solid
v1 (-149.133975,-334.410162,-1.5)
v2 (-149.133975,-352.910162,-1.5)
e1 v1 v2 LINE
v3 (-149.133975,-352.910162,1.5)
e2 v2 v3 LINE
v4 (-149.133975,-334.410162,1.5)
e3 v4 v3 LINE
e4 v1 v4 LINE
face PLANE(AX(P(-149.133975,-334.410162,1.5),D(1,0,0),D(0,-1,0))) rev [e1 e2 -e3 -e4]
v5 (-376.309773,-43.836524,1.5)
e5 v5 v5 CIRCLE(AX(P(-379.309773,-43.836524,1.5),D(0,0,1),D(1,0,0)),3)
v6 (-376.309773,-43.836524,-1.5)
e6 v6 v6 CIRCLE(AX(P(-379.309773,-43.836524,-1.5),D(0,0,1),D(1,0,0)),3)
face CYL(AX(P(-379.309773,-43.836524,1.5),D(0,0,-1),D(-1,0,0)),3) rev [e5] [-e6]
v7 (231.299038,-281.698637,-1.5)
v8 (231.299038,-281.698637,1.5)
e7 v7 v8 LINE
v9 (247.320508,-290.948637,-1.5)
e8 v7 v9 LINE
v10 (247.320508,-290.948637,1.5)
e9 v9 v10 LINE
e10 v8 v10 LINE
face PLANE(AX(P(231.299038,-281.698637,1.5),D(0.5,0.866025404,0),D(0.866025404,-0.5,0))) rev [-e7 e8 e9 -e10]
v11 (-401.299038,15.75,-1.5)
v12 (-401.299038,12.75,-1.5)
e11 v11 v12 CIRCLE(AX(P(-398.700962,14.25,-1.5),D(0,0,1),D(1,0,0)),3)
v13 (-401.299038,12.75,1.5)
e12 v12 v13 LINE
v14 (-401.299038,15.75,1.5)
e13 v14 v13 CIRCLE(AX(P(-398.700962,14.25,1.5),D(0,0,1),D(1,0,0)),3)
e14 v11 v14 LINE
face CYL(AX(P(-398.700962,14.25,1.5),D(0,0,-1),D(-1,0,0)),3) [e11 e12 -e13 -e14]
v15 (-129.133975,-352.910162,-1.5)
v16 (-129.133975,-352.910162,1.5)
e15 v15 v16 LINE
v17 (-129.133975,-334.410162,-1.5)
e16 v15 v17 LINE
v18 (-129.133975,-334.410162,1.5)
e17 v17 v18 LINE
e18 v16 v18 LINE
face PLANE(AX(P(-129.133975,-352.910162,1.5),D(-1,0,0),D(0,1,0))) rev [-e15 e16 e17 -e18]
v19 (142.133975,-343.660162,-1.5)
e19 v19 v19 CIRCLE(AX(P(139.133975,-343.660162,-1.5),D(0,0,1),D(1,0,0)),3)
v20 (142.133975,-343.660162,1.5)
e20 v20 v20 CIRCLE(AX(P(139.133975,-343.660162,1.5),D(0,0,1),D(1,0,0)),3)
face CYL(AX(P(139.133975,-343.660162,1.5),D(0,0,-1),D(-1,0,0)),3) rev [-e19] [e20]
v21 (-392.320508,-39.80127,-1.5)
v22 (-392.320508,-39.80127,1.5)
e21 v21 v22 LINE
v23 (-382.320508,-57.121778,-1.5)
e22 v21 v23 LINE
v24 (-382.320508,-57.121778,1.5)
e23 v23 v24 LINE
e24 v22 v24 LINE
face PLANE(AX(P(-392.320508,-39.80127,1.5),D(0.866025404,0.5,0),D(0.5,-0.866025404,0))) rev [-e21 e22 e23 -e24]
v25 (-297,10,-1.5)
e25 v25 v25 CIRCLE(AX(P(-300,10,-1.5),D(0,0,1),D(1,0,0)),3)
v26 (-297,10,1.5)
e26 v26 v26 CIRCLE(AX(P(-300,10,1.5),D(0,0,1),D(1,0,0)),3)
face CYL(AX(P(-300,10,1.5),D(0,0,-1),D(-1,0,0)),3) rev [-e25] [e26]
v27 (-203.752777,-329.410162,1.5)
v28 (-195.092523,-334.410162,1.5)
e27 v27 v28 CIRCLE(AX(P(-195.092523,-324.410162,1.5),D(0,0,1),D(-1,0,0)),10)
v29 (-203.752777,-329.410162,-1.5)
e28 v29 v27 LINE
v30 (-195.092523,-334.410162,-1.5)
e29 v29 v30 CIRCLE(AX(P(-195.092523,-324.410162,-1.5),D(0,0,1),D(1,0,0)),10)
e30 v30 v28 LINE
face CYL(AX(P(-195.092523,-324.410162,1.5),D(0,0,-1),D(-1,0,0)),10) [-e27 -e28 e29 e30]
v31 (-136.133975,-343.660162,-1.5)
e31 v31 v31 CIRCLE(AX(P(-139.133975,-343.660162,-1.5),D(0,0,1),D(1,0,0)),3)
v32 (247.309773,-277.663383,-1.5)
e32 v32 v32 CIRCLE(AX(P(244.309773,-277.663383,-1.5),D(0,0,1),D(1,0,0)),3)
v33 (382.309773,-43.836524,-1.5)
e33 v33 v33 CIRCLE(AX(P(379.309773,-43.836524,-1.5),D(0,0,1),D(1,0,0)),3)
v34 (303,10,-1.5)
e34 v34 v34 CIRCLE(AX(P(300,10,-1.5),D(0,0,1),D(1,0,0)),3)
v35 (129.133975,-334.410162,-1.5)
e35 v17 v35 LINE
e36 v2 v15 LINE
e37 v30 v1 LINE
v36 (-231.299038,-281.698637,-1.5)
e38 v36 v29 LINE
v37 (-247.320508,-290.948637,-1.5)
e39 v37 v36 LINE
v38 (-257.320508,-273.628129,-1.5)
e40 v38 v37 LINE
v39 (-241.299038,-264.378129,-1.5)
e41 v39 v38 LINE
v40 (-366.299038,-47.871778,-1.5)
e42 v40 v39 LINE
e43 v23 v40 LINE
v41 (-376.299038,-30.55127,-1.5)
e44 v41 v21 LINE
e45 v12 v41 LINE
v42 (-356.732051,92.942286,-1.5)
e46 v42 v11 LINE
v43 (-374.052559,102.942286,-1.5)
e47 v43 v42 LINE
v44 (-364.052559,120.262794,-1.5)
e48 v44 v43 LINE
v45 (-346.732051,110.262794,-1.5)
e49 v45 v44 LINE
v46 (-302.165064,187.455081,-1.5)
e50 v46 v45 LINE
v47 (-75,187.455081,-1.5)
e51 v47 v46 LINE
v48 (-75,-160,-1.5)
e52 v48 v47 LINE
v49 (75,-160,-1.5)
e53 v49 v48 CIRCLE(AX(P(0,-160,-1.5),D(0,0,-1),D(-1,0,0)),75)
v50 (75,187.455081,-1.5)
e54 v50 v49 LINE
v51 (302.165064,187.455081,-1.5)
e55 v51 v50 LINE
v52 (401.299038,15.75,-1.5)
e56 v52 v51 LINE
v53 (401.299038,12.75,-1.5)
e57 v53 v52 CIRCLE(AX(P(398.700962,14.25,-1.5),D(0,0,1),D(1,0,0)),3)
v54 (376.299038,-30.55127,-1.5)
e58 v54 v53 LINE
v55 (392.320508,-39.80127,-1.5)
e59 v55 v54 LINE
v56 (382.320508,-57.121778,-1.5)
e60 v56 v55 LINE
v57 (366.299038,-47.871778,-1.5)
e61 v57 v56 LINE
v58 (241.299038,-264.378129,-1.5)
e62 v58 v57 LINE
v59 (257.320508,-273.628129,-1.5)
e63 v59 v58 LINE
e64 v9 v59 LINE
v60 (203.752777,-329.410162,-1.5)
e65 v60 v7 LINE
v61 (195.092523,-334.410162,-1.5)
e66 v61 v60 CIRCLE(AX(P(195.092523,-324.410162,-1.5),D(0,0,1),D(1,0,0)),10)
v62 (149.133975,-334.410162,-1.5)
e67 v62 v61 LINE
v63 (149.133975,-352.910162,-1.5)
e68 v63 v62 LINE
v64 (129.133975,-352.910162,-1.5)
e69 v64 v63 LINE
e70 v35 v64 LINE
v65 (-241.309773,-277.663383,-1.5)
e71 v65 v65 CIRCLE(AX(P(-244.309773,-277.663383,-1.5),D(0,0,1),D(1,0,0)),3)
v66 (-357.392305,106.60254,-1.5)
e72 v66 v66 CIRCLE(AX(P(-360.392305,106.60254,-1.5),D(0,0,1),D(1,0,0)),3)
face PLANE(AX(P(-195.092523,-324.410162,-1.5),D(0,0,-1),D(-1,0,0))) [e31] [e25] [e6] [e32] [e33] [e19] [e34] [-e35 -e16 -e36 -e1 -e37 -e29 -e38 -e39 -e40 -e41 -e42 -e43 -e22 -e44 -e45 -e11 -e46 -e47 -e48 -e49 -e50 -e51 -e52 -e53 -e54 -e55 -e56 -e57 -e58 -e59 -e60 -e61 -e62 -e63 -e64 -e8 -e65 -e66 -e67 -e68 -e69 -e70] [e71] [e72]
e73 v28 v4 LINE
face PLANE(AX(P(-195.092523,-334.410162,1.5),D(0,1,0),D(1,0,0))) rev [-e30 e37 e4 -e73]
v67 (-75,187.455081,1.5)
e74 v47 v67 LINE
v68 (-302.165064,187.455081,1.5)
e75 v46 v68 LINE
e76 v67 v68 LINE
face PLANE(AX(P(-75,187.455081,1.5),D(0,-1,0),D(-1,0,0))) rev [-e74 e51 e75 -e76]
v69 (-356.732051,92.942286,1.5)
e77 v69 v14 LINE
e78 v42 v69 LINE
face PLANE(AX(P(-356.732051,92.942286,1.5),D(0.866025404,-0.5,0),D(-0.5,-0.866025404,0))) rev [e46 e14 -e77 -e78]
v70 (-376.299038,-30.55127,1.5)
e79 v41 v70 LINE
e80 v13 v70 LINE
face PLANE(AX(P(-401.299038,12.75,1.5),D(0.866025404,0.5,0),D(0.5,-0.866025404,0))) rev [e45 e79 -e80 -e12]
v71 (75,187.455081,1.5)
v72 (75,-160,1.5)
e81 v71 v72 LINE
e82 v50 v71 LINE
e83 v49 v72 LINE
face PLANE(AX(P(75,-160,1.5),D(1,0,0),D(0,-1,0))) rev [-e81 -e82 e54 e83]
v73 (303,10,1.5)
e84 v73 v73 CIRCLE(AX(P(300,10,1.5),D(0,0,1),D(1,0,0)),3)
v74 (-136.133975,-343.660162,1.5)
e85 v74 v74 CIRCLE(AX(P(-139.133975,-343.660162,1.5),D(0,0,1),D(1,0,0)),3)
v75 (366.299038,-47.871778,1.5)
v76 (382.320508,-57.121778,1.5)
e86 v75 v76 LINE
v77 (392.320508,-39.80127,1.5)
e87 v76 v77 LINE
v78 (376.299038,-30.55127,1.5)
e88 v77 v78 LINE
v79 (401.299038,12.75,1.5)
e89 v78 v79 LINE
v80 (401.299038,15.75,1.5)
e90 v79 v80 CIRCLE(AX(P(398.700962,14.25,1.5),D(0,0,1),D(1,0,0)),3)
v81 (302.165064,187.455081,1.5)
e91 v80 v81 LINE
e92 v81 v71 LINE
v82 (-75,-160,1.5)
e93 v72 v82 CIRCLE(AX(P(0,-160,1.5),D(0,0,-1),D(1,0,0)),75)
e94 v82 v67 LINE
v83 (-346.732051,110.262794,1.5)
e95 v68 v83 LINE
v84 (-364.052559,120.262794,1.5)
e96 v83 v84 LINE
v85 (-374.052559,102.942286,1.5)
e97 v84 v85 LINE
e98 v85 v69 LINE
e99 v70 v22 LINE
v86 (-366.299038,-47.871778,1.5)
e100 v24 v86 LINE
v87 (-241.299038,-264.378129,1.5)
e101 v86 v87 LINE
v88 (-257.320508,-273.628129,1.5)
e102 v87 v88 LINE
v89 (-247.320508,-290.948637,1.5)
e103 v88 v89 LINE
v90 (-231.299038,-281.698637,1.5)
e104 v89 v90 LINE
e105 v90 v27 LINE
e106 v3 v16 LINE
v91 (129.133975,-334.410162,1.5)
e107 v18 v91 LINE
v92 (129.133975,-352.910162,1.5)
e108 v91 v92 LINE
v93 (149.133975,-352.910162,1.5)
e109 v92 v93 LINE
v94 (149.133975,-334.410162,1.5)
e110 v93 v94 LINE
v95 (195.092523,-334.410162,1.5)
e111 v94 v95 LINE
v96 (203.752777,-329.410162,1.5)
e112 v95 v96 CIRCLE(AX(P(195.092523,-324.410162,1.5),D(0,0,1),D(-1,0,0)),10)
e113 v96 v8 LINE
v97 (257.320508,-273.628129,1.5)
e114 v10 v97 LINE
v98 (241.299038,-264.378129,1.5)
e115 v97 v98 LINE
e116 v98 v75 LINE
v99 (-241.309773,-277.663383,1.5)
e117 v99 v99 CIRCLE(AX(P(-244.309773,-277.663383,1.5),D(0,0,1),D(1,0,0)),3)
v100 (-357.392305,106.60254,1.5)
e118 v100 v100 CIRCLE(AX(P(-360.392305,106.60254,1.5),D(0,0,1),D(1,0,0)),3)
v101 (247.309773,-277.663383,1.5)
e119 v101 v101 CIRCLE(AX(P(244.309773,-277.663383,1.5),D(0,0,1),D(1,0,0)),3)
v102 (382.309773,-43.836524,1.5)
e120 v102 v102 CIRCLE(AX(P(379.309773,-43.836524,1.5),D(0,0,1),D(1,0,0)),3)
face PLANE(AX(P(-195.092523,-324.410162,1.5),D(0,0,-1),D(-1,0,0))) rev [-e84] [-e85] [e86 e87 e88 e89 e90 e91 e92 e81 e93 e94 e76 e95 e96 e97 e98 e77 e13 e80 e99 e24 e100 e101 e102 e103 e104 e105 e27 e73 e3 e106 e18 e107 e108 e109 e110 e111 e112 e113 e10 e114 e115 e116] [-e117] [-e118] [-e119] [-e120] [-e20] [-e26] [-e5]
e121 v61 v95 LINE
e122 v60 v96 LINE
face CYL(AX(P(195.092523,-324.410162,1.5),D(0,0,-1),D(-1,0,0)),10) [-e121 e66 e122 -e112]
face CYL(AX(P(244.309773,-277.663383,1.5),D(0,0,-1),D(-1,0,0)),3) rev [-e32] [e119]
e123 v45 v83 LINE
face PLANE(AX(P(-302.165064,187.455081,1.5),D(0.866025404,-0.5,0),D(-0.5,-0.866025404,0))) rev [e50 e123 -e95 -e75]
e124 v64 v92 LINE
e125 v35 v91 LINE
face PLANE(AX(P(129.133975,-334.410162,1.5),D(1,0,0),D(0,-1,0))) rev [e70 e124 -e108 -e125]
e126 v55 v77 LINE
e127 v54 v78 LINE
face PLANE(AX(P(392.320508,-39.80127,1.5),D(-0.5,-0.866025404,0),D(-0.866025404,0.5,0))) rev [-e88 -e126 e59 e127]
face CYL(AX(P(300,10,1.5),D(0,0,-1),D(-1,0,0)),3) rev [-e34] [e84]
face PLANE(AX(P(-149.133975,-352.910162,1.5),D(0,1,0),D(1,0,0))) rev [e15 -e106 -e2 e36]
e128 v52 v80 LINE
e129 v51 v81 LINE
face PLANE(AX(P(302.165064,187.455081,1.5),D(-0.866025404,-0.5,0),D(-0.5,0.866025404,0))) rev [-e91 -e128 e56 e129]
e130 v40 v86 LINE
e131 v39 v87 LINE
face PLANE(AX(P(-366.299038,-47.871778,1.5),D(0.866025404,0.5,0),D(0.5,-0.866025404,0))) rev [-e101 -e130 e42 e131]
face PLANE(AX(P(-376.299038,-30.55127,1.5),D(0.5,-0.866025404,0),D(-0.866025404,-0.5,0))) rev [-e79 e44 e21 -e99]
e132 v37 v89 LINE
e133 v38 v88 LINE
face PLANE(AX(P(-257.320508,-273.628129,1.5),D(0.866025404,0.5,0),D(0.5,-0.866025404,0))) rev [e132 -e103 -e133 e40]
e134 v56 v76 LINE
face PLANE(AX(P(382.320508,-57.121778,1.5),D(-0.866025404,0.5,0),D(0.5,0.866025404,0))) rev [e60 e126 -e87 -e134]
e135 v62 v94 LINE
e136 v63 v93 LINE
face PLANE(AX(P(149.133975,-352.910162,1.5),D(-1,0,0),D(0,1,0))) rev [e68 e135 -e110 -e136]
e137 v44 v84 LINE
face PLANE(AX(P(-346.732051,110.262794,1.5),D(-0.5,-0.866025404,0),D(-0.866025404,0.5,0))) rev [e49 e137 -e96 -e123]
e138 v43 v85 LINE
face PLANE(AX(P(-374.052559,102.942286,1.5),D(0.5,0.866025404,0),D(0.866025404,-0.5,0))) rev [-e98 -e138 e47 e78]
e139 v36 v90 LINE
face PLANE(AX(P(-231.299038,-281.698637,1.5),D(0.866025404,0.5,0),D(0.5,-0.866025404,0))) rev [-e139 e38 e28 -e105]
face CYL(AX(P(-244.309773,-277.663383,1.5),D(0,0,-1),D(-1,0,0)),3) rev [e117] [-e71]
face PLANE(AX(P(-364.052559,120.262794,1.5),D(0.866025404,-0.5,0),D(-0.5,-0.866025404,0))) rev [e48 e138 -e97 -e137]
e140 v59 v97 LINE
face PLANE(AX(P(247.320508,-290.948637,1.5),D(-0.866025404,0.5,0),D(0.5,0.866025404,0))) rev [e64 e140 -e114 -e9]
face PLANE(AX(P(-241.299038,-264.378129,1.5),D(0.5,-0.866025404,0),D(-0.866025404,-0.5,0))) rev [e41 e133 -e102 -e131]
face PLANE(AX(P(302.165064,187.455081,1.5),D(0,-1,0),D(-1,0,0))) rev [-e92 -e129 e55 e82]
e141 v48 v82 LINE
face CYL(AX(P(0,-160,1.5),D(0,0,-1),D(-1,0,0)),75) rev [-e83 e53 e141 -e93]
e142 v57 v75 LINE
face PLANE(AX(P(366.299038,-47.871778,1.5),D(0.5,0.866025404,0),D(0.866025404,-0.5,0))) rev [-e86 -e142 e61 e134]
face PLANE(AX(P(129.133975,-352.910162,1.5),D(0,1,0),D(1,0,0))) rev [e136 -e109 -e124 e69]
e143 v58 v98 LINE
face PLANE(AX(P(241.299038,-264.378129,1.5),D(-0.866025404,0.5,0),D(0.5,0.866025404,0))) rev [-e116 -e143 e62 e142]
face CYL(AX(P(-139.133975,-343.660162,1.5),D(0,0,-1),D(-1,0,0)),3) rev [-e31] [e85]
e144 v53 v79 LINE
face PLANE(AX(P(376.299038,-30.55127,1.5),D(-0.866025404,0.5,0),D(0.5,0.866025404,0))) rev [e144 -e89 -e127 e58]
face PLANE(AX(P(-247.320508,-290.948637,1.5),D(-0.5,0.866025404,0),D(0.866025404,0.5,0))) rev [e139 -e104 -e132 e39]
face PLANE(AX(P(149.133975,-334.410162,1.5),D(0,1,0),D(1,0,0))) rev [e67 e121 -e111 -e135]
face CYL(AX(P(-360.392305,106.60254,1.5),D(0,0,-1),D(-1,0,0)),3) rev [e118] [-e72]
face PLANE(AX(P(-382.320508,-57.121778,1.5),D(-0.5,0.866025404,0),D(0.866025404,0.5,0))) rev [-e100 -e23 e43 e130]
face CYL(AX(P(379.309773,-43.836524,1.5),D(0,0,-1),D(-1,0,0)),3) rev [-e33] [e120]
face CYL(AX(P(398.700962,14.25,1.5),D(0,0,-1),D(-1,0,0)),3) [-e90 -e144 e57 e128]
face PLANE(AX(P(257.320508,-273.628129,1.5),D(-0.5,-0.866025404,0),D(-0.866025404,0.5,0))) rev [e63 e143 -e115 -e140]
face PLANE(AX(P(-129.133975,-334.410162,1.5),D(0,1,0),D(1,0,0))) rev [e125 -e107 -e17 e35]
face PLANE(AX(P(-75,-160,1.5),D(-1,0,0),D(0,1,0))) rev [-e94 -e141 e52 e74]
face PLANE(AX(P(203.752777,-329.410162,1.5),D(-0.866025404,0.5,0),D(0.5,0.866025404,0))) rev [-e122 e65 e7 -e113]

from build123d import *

# Parameters (mm, degrees)
SKETCH_1_R              = 3
EXTRUDE_1_DEPTH         = 1.5
SHEET_START             = -1.5
SHEET_METAL_1_OUTLINE_R = 3
SHEET_METAL_1_DEPTH     = 1.5


# Read off the part's stored shape, not the designer's step: Преобразовать-Твердое тело1
with BuildPart() as part:
    # Sketch 1 → Бобышка-Вытянуть1 (new body)
    with BuildSketch(Plane.XY):
        with BuildLine():
            Line((-75, -160), (-75, 187.455080757))
            Line((-75, 187.455080757), (-302.165063509, 187.455080757))
            Line((-302.165063509, 187.455080757), (-346.732050808, 110.262794416))
            Line((-346.732050808, 110.262794416), (-364.052558883, 120.262794416))
            Line((-364.052558883, 120.262794416), (-374.052558883, 102.942286341))
            Line((-374.052558883, 102.942286341), (-356.732050808, 92.942286341))
            Line((-356.732050808, 92.942286341), (-401.299038106, 15.75))
            ThreePointArc((-401.299038106, 15.75), (-401.700961894, 14.25), (-401.299038106, 12.75))
            Line((-401.299038106, 12.75), (-376.299038106, -30.551270189))
            Line((-376.299038106, -30.551270189), (-392.320508076, -39.801270189))
            Line((-392.320508076, -39.801270189), (-382.320508076, -57.121778265))
            Line((-382.320508076, -57.121778265), (-366.299038106, -47.871778265))
            Line((-366.299038106, -47.871778265), (-241.299038106, -264.378129211))
            Line((-241.299038106, -264.378129211), (-257.320508076, -273.628129211))
            Line((-257.320508076, -273.628129211), (-247.320508076, -290.948637287))
            Line((-247.320508076, -290.948637287), (-231.299038106, -281.698637287))
            Line((-231.299038106, -281.698637287), (-203.75277675, -329.410161514))
            ThreePointArc((-203.75277675, -329.410161514), (-200.092522712, -333.070415552), (-195.092522712, -334.410161514))
            Line((-195.092522712, -334.410161514), (-149.133974596, -334.410161514))
            Line((-149.133974596, -334.410161514), (-149.133974596, -352.910161514))
            Line((-149.133974596, -352.910161514), (-129.133974596, -352.910161514))
            Line((-129.133974596, -352.910161514), (-129.133974596, -334.410161514))
            Line((-129.133974596, -334.410161514), (129.133974596, -334.410161514))
            Line((129.133974596, -334.410161514), (129.133974596, -352.910161514))
            Line((129.133974596, -352.910161514), (149.133974596, -352.910161514))
            Line((149.133974596, -352.910161514), (149.133974596, -334.410161514))
            Line((149.133974596, -334.410161514), (195.092522712, -334.410161514))
            ThreePointArc((195.092522712, -334.410161514), (200.092522712, -333.070415552), (203.75277675, -329.410161514))
            Line((203.75277675, -329.410161514), (231.299038106, -281.698637287))
            Line((231.299038106, -281.698637287), (247.320508076, -290.948637287))
            Line((247.320508076, -290.948637287), (257.320508076, -273.628129211))
            Line((257.320508076, -273.628129211), (241.299038106, -264.378129211))
            Line((241.299038106, -264.378129211), (366.299038106, -47.871778265))
            Line((366.299038106, -47.871778265), (382.320508076, -57.121778265))
            Line((382.320508076, -57.121778265), (392.320508076, -39.801270189))
            Line((392.320508076, -39.801270189), (376.299038106, -30.551270189))
            Line((376.299038106, -30.551270189), (401.299038106, 12.75))
            ThreePointArc((401.299038106, 12.75), (401.700961894, 14.25), (401.299038106, 15.75))
            Line((401.299038106, 15.75), (302.165063509, 187.455080757))
            Line((302.165063509, 187.455080757), (75, 187.455080757))
            Line((75, 187.455080757), (75, -160))
            ThreePointArc((75, -160), (0, -235), (-75, -160))
        make_face()
        with Locations((244.309773091, -277.663383249)):
            Circle(SKETCH_1_R, mode=Mode.SUBTRACT)
        with Locations((139.133974596, -343.660161514)):
            Circle(SKETCH_1_R, mode=Mode.SUBTRACT)
        with Locations((-139.133974596, -343.660161514)):
            Circle(SKETCH_1_R, mode=Mode.SUBTRACT)
        with Locations((-244.309773091, -277.663383249)):
            Circle(SKETCH_1_R, mode=Mode.SUBTRACT)
        with Locations((300, 10)):
            Circle(SKETCH_1_R, mode=Mode.SUBTRACT)
        with Locations((-300, 10)):
            Circle(SKETCH_1_R, mode=Mode.SUBTRACT)
        with Locations((-379.309773091, -43.836524227)):
            Circle(SKETCH_1_R, mode=Mode.SUBTRACT)
        with Locations((379.309773091, -43.836524227)):
            Circle(SKETCH_1_R, mode=Mode.SUBTRACT)
        with Locations((-360.392304845, 106.602540378)):
            Circle(SKETCH_1_R, mode=Mode.SUBTRACT)
    extrude(amount=EXTRUDE_1_DEPTH)

    # Sheet Metal 1 outline → Sheet Metal 1 (add)
    with BuildSketch(Plane.XY.offset(SHEET_START)):
        with BuildLine():
            Line((-149.133974596, -334.410161514), (-149.133974596, -352.910161514))
            Line((-149.133974596, -352.910161514), (-129.133974596, -352.910161514))
            Line((-129.133974596, -352.910161514), (-129.133974596, -334.410161514))
            Line((-129.133974596, -334.410161514), (129.133974596, -334.410161514))
            Line((129.133974596, -334.410161514), (129.133974596, -352.910161514))
            Line((129.133974596, -352.910161514), (149.133974596, -352.910161514))
            Line((149.133974596, -352.910161514), (149.133974596, -334.410161514))
            Line((149.133974596, -334.410161514), (195.092522712, -334.410161514))
            ThreePointArc((195.092522712, -334.410161514), (200.092522712, -333.070415552), (203.75277675, -329.410161514))
            Line((203.75277675, -329.410161514), (231.299038106, -281.698637287))
            Line((231.299038106, -281.698637287), (247.320508076, -290.948637287))
            Line((247.320508076, -290.948637287), (257.320508076, -273.628129211))
            Line((257.320508076, -273.628129211), (241.299038106, -264.378129211))
            Line((241.299038106, -264.378129211), (366.299038106, -47.871778265))
            Line((366.299038106, -47.871778265), (382.320508076, -57.121778265))
            Line((382.320508076, -57.121778265), (392.320508076, -39.801270189))
            Line((392.320508076, -39.801270189), (376.299038106, -30.551270189))
            Line((376.299038106, -30.551270189), (401.299038106, 12.75))
            ThreePointArc((401.299038106, 12.75), (401.700961894, 14.25), (401.299038106, 15.75))
            Line((401.299038106, 15.75), (302.165063509, 187.455080757))
            Line((302.165063509, 187.455080757), (75, 187.455080757))
            Line((75, 187.455080757), (75, -160))
            ThreePointArc((75, -160), (0, -235), (-75, -160))
            Line((-75, -160), (-75, 187.455080757))
            Line((-75, 187.455080757), (-302.165063509, 187.455080757))
            Line((-302.165063509, 187.455080757), (-346.732050808, 110.262794416))
            Line((-346.732050808, 110.262794416), (-364.052558883, 120.262794416))
            Line((-364.052558883, 120.262794416), (-374.052558883, 102.942286341))
            Line((-374.052558883, 102.942286341), (-356.732050808, 92.942286341))
            Line((-356.732050808, 92.942286341), (-401.299038106, 15.75))
            ThreePointArc((-401.299038106, 15.75), (-401.700961894, 14.25), (-401.299038106, 12.75))
            Line((-401.299038106, 12.75), (-376.299038106, -30.551270189))
            Line((-376.299038106, -30.551270189), (-392.320508076, -39.801270189))
            Line((-392.320508076, -39.801270189), (-382.320508076, -57.121778265))
            Line((-382.320508076, -57.121778265), (-366.299038106, -47.871778265))
            Line((-366.299038106, -47.871778265), (-241.299038106, -264.378129211))
            Line((-241.299038106, -264.378129211), (-257.320508076, -273.628129211))
            Line((-257.320508076, -273.628129211), (-247.320508076, -290.948637287))
            Line((-247.320508076, -290.948637287), (-231.299038106, -281.698637287))
            Line((-231.299038106, -281.698637287), (-203.75277675, -329.410161514))
            ThreePointArc((-203.75277675, -329.410161514), (-200.092522712, -333.070415552), (-195.092522712, -334.410161514))
            Line((-195.092522712, -334.410161514), (-149.133974596, -334.410161514))
        make_face()
        with Locations((-244.309773091, -277.663383249)):
            Circle(SHEET_METAL_1_OUTLINE_R, mode=Mode.SUBTRACT)
        with Locations((-139.133974596, -343.660161514)):
            Circle(SHEET_METAL_1_OUTLINE_R, mode=Mode.SUBTRACT)
        with Locations((139.133974596, -343.660161514)):
            Circle(SHEET_METAL_1_OUTLINE_R, mode=Mode.SUBTRACT)
        with Locations((244.309773091, -277.663383249)):
            Circle(SHEET_METAL_1_OUTLINE_R, mode=Mode.SUBTRACT)
        with Locations((-379.309773091, -43.836524227)):
            Circle(SHEET_METAL_1_OUTLINE_R, mode=Mode.SUBTRACT)
        with Locations((-300, 10)):
            Circle(SHEET_METAL_1_OUTLINE_R, mode=Mode.SUBTRACT)
        with Locations((-360.392304845, 106.602540378)):
            Circle(SHEET_METAL_1_OUTLINE_R, mode=Mode.SUBTRACT)
        with Locations((379.309773091, -43.836524227)):
            Circle(SHEET_METAL_1_OUTLINE_R, mode=Mode.SUBTRACT)
        with Locations((300, 10)):
            Circle(SHEET_METAL_1_OUTLINE_R, mode=Mode.SUBTRACT)
    extrude(amount=SHEET_METAL_1_DEPTH)


solid = part.part
